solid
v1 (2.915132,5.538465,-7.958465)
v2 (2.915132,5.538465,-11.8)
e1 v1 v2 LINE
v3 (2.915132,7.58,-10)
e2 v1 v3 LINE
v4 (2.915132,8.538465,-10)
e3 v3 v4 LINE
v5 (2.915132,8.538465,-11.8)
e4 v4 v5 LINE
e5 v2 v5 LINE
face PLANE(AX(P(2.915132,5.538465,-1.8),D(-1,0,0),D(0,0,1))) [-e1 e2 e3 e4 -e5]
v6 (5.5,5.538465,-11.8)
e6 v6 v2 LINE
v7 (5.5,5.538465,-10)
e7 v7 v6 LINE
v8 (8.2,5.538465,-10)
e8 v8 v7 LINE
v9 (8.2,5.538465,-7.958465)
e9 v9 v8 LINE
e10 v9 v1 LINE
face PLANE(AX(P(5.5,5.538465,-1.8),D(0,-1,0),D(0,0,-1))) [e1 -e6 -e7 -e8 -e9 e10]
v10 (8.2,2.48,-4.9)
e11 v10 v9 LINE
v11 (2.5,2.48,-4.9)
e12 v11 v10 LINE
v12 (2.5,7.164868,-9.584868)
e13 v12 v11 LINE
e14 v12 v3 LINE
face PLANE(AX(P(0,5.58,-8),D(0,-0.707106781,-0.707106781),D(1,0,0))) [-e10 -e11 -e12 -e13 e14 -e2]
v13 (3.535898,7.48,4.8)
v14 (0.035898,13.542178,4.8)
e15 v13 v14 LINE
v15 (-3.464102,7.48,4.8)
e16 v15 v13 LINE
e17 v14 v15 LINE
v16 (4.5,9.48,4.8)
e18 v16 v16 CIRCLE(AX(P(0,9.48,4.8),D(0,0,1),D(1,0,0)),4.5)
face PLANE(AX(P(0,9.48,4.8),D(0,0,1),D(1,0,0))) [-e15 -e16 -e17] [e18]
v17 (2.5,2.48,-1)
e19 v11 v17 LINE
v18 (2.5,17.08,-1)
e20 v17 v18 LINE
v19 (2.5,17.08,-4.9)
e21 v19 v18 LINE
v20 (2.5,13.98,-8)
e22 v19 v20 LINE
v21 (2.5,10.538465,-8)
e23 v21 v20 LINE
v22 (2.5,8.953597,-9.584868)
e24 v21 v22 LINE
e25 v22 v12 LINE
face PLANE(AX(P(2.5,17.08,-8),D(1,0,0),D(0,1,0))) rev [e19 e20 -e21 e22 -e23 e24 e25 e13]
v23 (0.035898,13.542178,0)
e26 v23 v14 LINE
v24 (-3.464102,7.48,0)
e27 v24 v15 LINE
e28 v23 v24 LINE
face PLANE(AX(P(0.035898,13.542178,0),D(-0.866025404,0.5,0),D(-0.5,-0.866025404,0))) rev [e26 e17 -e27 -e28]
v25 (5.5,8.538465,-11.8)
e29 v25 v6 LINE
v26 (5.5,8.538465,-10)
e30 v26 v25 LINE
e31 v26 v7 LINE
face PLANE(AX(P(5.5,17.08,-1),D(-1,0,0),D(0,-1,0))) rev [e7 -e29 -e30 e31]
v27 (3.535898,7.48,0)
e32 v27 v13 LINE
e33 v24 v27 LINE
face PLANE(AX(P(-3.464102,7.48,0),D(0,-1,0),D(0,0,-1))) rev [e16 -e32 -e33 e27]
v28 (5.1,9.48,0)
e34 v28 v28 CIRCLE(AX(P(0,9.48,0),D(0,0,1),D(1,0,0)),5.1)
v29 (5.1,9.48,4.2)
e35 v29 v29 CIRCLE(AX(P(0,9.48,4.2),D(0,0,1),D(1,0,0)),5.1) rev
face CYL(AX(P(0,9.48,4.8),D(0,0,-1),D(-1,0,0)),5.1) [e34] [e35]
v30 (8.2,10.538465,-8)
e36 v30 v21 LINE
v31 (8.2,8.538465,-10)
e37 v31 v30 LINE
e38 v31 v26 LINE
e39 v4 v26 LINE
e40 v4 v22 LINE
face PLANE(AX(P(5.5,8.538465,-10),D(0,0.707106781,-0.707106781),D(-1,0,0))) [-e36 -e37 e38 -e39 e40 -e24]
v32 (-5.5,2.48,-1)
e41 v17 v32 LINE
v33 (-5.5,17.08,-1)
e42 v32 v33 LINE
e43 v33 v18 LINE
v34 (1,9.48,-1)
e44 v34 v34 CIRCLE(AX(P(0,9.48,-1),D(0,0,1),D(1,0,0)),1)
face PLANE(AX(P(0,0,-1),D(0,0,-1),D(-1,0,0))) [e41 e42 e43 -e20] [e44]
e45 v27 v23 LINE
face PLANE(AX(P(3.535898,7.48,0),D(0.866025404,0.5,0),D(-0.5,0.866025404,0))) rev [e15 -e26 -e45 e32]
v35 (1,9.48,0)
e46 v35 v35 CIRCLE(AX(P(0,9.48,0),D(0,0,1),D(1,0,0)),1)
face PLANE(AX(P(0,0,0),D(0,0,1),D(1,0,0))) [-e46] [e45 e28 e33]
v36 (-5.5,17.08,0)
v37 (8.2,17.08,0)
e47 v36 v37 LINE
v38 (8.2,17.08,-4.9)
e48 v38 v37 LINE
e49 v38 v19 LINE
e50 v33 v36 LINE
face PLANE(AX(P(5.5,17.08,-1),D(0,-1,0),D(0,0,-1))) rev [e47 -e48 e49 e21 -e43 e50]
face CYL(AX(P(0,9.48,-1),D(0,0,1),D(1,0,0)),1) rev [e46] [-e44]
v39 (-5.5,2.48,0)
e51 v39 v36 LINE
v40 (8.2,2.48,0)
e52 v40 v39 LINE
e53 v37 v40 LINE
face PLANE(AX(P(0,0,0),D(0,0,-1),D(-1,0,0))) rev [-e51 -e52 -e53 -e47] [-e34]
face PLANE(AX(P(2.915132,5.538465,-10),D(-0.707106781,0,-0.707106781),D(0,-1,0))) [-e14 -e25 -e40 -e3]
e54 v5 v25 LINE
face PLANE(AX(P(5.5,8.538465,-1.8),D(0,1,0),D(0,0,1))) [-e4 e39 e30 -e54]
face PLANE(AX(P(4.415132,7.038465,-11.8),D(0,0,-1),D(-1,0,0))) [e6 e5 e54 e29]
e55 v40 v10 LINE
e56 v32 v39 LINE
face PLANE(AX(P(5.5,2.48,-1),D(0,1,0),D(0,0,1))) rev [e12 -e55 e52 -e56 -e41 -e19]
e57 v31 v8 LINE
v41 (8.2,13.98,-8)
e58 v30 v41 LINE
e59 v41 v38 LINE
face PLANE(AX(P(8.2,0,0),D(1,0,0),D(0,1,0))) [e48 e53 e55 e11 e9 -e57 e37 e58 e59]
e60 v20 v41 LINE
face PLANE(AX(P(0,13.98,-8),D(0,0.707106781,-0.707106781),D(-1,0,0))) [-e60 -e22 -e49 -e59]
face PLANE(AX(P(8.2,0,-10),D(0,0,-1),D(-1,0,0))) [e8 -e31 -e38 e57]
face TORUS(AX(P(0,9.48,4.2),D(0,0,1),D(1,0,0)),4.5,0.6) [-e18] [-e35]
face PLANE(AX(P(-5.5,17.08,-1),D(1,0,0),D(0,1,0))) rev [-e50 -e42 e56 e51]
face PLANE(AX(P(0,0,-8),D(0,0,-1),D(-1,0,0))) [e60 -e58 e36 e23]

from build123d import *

# Parameters (mm, degrees)
SKETCH_2_R          = 5.1
EXTRUDE_1_DEPTH     = 4.8
SKETCH_3_W          = 11
SKETCH_3_H          = 14.6
EXTRUDE_2_DEPTH     = 1
SKETCH_4_R          = 1.5
EXTRUDE_3_DEPTH     = 10.8
CUT_EXTRUDE_1_DEPTH = 10.8
FILLET_1_R          = 0.6
CUT_EXTRUDE_2_DEPTH = 4.8
SKETCH_7_R          = 1
CUT_EXTRUDE_3_DEPTH = 1
SKETCH_8_W          = 3
SKETCH_8_H          = 14.6
EXTRUDE_4_DEPTH     = 7
CHAMFER_1_SIZE      = 3.1
SKETCH_9_W          = 2.584868303
SKETCH_9_H          = 3
EXTRUDE_5_DEPTH     = 10
CHAMFER_3_SIZE      = 2
CHAMFER_4_SIZE      = 2
EXTRUDE_6_DEPTH     = 2.7


with BuildPart() as part:
    # Эскиз2 → Бобышка-Вытянуть1 (new body)
    with BuildSketch(Plane.XY):
        with Locations((0, 9.48)):
            Circle(SKETCH_2_R)
    extrude(amount=EXTRUDE_1_DEPTH)

    # Эскиз3 → Бобышка-Вытянуть2 (add)
    with BuildSketch(Plane(origin=(0, 0, 0), x_dir=(-1, 0, 0), z_dir=(0, 0, -1))):
        with Locations((0, 9.78)):
            Rectangle(SKETCH_3_W, SKETCH_3_H)
    extrude(amount=EXTRUDE_2_DEPTH)

    # Эскиз4 → Бобышка-Вытянуть3 (add)
    with BuildSketch(Plane(origin=(0, 0, -1), x_dir=(-1, 0, 0), z_dir=(0, 0, -1))):
        with Locations(Location((-4.415131697, 7.038465404, 0), (0, 0, 223.676907922))):
            Circle(SKETCH_4_R)
    extrude(amount=EXTRUDE_3_DEPTH)

    # Эскиз5 → Вырез-Вытянуть1 (cut)
    with BuildSketch(Plane.XY.offset(-1)):
        with BuildLine():
            Line((5.5, 8.074351868), (5.5, 6.002578941))
            ThreePointArc((5.5, 6.002578941), (5.915131697, 7.038465404), (5.5, 8.074351868))
        make_face()
    extrude(amount=-CUT_EXTRUDE_1_DEPTH, mode=Mode.SUBTRACT)

    # Скругление1
    fillet_1_edges = [part.edges().sort_by_distance(p)[0] for p in [
        (-5.1, 9.48, 4.8),
    ]]
    fillet(fillet_1_edges, radius=FILLET_1_R)

    # Эскиз6 → Вырез-Вытянуть2 (cut)
    with BuildSketch(Plane.XY.offset(4.8)):
        Polygon((0.035898385, 13.542177826), (-3.464101615, 7.48), (3.535898385, 7.48), align=None)
    extrude(amount=-CUT_EXTRUDE_2_DEPTH, mode=Mode.SUBTRACT)

    # Эскиз7 → Вырез-Вытянуть3 (cut)
    with BuildSketch(Plane.XY):
        with Locations((0, 9.48)):
            Circle(SKETCH_7_R)
    extrude(amount=-CUT_EXTRUDE_3_DEPTH, mode=Mode.SUBTRACT)

    # Эскиз8 → Бобышка-Вытянуть4 (add)
    with BuildSketch(Plane(origin=(0, 0, -1), x_dir=(-1, 0, 0), z_dir=(0, 0, -1))):
        with Locations((-4, 9.78)):
            Rectangle(SKETCH_8_W, SKETCH_8_H)
    extrude(amount=EXTRUDE_4_DEPTH)

    # Фаска1
    # the kernel refuses this chamfer: 3.1 mm, written as the material it takes off along each edge
    with BuildSketch(Plane(origin=(-5.472217263, 2.48, -8), x_dir=(0, -0.027495876610586382, 0.9996219169112966), z_dir=(1, 0, 0))) as chamfer_1_piece_1_section:
        Polygon((CHAMFER_1_SIZE * 0.999621916911, -CHAMFER_1_SIZE * 0.0274958766106), (-CHAMFER_1_SIZE * 0.0274958766106, -CHAMFER_1_SIZE * 0.999621916911), (0, 0), align=None)
    chamfer_1_piece_1 = extrude(amount=18.944434525, mode=Mode.PRIVATE)
    chamfer_1_piece_1 = chamfer_1_piece_1 - Plane(origin=(4.415131697, 7.038465404, -6.977511347), x_dir=(0.7232455354515278, -0.6905909755053515, 0), z_dir=(0, 0, 1)) * Cylinder(1.5, 51, mode=Mode.PRIVATE)
    add(chamfer_1_piece_1, mode=Mode.SUBTRACT)
    with BuildSketch(Plane(origin=(13.472217263, 17.08, -8), x_dir=(0, -0.9996219169112966, -0.027495876610586514), z_dir=(-1, 0, 0))) as chamfer_1_piece_2:
        Polygon((CHAMFER_1_SIZE * 0.999621916911, CHAMFER_1_SIZE * 0.0274958766106), (-CHAMFER_1_SIZE * 0.0274958766106, CHAMFER_1_SIZE * 0.999621916911), (0, 0), align=None)
    extrude(amount=18.944434525, mode=Mode.SUBTRACT)

    # Эскиз9 → Бобышка-Вытянуть5 (add)
    with BuildSketch(Plane(origin=(0, 0, -11.8), x_dir=(-1, 0, 0), z_dir=(0, 0, -1))):
        with Locations((-4.207565848, 7.038465404)):
            Rectangle(SKETCH_9_W, SKETCH_9_H)
    extrude(amount=-EXTRUDE_5_DEPTH)

    # Фаска3
    chamfer_3_edges = [part.edges().sort_by_distance(p)[0] for p in [
        (4.207565848, 8.538465404, -8),
    ]]
    chamfer(chamfer_3_edges, length=CHAMFER_3_SIZE)

    # Фаска4
    # the kernel refuses this chamfer: 2 mm, written as the material it adds along each edge
    with BuildSketch(Plane(origin=(2.915131697, 15.68183138, -8), x_dir=(-0.9996219169112968, 6.965053790802993e-15, 0.027495876610586487), z_dir=(0, -1, 0))) as chamfer_4_piece_1_section:
        Polygon((CHAMFER_4_SIZE * 0.999621916911, CHAMFER_4_SIZE * 0.0274958766106), (-CHAMFER_4_SIZE * 0.0274958766106, CHAMFER_4_SIZE * 0.999621916911), (0, 0), align=None)
    chamfer_4_piece_1 = extrude(amount=15.245197356, mode=Mode.PRIVATE)
    chamfer_4_piece_1 = split(chamfer_4_piece_1, bisect_by=Plane(origin=(2.5, 9.220354444, -8.636221921), z_dir=(1, 0, 0)), keep=Keep.TOP, mode=Mode.PRIVATE)
    chamfer_4_piece_1 = split(chamfer_4_piece_1, bisect_by=Plane(origin=(2.728922141, 9.561298963, -8.977166441), z_dir=(0, -0.7071067811865476, 0.7071067811865476)), keep=Keep.TOP, mode=Mode.PRIVATE)
    chamfer_4_piece_1 = split(chamfer_4_piece_1, bisect_by=Plane(origin=(2.728922141, 8.538465404, -8.636221921), z_dir=(0, 1, 0)), keep=Keep.TOP, mode=Mode.PRIVATE)
    add(chamfer_4_piece_1)
    with BuildSketch(Plane(origin=(2.915131697, 15.68183138, -8), x_dir=(-0.9996219169112968, 6.965053790802993e-15, 0.027495876610586487), z_dir=(0, -1, 0))) as chamfer_4_piece_2_section:
        Polygon((CHAMFER_4_SIZE * 0.999621916911, CHAMFER_4_SIZE * 0.0274958766106), (-CHAMFER_4_SIZE * 0.0274958766106, CHAMFER_4_SIZE * 0.999621916911), (0, 0), align=None)
    chamfer_4_piece_2 = extrude(amount=15.245197356, mode=Mode.PRIVATE)
    chamfer_4_piece_2 = split(chamfer_4_piece_2, bisect_by=Plane(origin=(2.5, 7.443880943, -8.769342974), z_dir=(1, 0, 0)), keep=Keep.TOP, mode=Mode.PRIVATE)
    chamfer_4_piece_2 = split(chamfer_4_piece_2, bisect_by=Plane(origin=(2.735166787, 6.896611958, -9.316611958), z_dir=(0, 0.7071067811862648, 0.7071067811868302)), keep=Keep.TOP, mode=Mode.PRIVATE)
    chamfer_4_piece_2 = split(chamfer_4_piece_2, bisect_by=Plane(origin=(2.735166787, 8.606501686, -9.931963718), z_dir=(0, -0.7071067811865476, 0.7071067811865476)), keep=Keep.TOP, mode=Mode.PRIVATE)
    chamfer_4_piece_2 = split(chamfer_4_piece_2, bisect_by=Plane(origin=(2.735166787, 8.538465404, -8.769342974), z_dir=(0, -1, 0)), keep=Keep.TOP, mode=Mode.PRIVATE)
    add(chamfer_4_piece_2)

    # Эскиз10 → Бобышка-Вытянуть6 (add)
    with BuildSketch(Plane(origin=(5.5, 0, 0), x_dir=(0, 0, -1), z_dir=(1, 0, 0))):
        Polygon((10, 5.538465404), (10, 8.538465404), (8, 10.538465404), (8, 13.98), (4.9, 17.08), (0, 17.08), (0, 2.48), (4.9, 2.48), (7.958465404, 5.538465404), align=None)
    extrude(amount=EXTRUDE_6_DEPTH)


solid = part.part
